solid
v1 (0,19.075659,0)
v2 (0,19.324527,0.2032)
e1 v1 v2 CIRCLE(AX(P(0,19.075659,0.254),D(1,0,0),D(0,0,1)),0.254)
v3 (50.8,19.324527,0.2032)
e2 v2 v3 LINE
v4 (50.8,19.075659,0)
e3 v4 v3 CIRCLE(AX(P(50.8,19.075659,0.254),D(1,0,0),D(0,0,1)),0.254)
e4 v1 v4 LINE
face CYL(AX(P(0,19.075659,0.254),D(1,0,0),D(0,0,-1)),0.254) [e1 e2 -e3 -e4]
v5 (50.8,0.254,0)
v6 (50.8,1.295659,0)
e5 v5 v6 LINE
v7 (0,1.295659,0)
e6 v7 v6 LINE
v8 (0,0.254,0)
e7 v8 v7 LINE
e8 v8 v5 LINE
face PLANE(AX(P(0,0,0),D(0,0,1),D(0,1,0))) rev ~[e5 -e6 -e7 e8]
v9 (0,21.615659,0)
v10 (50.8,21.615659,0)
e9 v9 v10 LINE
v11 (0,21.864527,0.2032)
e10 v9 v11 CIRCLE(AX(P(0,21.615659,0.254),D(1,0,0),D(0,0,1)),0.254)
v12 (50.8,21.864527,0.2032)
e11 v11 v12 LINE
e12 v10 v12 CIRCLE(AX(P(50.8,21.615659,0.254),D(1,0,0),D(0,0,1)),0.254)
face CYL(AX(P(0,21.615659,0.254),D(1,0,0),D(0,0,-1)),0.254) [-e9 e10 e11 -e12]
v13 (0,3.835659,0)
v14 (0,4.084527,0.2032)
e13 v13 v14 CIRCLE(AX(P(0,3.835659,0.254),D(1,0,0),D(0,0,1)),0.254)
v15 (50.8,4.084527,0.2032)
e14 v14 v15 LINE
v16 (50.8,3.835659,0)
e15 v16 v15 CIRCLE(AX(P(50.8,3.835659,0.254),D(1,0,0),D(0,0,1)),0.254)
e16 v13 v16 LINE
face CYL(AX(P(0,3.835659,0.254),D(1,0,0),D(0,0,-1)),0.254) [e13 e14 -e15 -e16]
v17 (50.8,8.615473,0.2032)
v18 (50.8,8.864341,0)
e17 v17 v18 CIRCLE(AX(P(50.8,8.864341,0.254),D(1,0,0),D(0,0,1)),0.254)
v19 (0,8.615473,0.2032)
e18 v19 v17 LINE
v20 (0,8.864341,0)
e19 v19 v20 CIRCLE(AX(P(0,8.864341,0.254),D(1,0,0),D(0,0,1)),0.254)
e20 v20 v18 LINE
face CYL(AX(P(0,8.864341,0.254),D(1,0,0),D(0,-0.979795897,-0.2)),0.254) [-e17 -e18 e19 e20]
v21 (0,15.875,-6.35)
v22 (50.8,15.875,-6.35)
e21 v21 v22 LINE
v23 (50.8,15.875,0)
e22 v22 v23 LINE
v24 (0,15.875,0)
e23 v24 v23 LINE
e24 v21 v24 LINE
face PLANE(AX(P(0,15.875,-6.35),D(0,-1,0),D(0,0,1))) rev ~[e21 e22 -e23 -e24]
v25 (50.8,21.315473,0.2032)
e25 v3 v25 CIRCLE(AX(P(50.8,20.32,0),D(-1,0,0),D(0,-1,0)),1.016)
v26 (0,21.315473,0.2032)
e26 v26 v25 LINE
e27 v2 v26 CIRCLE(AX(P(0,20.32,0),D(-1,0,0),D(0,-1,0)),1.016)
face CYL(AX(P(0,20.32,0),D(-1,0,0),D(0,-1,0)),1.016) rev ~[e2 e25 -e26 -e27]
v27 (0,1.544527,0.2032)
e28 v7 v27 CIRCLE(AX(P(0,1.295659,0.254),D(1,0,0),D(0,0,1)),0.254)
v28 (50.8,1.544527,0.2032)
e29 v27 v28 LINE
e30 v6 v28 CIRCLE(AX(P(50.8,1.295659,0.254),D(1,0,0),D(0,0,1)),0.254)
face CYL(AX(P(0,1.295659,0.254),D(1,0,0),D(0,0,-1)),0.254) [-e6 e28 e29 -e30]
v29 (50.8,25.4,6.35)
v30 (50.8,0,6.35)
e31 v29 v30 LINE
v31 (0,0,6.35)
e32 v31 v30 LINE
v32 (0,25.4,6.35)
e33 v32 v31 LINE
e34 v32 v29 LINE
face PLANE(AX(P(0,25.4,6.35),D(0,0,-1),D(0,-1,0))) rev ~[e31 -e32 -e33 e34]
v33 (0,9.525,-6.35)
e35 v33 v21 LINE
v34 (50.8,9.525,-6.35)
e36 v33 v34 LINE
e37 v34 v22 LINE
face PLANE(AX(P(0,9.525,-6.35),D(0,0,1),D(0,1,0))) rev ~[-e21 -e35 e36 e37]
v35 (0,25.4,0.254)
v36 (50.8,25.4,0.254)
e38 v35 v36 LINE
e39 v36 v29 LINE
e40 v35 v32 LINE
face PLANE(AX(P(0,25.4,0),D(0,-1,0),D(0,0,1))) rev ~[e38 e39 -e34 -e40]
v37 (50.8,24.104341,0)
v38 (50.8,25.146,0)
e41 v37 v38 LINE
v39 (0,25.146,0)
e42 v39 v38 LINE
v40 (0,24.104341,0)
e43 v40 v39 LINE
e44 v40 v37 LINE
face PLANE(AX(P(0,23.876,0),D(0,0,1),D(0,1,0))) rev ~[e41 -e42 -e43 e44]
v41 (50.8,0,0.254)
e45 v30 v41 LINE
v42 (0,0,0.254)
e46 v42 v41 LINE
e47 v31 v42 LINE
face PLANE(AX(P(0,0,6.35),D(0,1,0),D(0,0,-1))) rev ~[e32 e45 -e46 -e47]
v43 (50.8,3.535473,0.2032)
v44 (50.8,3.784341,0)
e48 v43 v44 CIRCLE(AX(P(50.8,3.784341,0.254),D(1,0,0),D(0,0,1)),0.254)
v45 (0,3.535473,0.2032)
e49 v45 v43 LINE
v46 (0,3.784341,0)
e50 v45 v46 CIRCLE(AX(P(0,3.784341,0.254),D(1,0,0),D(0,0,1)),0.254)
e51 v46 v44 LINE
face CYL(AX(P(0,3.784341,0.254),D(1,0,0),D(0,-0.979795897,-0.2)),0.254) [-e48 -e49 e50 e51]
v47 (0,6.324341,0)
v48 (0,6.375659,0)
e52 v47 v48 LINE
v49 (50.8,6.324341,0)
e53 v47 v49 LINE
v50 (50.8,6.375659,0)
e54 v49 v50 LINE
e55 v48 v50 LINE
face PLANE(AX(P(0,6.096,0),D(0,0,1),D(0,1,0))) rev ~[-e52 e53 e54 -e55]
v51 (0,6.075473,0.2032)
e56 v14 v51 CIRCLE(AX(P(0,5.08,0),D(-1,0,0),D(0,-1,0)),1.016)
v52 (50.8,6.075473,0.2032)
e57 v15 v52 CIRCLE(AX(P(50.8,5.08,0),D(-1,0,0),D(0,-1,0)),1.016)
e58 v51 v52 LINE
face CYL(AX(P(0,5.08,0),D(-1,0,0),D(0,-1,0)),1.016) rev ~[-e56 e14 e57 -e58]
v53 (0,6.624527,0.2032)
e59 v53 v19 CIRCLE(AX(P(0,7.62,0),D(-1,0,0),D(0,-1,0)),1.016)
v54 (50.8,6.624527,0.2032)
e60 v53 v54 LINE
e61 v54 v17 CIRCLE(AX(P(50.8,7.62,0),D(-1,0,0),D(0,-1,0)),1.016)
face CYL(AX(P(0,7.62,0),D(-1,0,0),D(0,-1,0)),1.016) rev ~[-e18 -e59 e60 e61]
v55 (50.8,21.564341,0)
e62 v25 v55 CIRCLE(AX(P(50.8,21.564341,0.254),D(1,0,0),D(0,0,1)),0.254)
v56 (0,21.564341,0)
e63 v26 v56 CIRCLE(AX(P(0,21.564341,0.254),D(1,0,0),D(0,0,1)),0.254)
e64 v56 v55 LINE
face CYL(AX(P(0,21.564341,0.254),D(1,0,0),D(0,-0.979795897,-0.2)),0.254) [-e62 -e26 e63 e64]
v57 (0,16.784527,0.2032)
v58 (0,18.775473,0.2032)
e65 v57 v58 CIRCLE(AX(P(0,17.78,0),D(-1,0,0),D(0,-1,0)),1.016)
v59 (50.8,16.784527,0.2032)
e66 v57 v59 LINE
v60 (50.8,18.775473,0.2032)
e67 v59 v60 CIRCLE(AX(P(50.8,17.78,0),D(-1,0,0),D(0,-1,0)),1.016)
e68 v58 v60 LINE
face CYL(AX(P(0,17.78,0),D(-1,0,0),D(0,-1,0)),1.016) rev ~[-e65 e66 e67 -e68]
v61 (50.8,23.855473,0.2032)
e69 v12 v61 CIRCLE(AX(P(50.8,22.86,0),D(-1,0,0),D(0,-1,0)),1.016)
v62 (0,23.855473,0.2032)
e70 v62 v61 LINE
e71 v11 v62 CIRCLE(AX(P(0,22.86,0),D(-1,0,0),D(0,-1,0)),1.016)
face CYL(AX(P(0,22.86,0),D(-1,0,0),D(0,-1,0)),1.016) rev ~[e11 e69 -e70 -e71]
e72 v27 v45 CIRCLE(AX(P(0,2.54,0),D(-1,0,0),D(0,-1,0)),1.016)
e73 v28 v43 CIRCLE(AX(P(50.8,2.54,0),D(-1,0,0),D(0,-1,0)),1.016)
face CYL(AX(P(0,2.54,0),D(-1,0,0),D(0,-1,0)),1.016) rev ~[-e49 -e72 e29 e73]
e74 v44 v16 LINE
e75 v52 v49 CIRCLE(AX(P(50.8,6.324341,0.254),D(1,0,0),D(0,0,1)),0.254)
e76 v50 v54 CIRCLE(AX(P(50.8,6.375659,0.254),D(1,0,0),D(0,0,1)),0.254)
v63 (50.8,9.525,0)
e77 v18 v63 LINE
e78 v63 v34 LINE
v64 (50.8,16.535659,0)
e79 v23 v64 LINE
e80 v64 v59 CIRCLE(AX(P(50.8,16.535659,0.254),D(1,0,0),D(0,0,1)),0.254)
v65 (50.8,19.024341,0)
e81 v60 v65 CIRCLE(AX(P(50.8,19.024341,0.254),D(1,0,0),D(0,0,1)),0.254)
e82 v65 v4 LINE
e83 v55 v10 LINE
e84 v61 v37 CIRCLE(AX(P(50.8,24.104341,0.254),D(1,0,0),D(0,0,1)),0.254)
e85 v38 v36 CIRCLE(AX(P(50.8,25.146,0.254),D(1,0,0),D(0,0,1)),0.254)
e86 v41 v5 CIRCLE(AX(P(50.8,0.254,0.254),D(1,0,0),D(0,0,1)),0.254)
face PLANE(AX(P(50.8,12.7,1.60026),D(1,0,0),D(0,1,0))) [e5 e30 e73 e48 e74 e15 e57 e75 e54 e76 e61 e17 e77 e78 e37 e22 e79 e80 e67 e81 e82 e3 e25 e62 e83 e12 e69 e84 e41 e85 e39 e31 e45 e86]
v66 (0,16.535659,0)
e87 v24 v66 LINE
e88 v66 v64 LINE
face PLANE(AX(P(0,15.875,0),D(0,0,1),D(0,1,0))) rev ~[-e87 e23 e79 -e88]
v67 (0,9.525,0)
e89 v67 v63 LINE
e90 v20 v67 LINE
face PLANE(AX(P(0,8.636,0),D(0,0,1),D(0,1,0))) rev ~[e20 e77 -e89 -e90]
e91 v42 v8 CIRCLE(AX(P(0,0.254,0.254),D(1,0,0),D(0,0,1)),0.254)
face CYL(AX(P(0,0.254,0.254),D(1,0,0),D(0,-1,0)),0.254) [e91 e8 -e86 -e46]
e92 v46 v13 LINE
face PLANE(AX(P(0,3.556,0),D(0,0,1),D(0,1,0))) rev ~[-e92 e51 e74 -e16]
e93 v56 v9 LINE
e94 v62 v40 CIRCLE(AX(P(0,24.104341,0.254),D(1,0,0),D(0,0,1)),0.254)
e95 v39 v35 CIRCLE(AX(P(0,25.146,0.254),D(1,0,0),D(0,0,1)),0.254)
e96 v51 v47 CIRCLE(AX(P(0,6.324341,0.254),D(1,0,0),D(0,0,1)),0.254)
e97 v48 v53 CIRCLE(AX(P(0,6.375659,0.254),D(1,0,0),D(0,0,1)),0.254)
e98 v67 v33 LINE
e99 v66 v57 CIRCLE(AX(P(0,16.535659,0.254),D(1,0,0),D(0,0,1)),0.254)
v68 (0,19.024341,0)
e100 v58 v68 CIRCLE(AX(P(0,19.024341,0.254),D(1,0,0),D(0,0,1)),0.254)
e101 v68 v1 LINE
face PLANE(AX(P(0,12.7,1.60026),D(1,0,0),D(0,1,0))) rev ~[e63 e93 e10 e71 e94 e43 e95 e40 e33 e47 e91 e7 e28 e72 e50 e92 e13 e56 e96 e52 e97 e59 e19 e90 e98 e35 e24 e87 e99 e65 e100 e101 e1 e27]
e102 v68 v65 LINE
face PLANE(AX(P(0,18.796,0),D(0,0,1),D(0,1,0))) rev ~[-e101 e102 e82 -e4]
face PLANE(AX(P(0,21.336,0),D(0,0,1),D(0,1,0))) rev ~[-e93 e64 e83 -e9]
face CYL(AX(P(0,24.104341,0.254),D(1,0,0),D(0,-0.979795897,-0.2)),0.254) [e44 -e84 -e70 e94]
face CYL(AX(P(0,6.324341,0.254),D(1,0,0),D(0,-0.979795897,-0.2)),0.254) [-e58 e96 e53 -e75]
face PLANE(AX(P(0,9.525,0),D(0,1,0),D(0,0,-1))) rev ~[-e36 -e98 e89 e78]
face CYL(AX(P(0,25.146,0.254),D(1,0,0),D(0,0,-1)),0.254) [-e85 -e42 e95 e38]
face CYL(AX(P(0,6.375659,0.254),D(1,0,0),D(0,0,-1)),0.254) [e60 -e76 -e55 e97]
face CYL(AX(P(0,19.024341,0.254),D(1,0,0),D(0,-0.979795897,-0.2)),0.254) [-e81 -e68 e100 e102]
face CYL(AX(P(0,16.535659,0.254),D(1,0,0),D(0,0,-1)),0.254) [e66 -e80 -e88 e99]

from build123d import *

# Parameters (mm, degrees)
F1_DEPTH = 50.8
F2_R     = 0.254


with BuildPart() as f1:
    # F0 (on Right) → F1 (new body)
    with BuildSketch(Plane.YZ):
        with BuildLine():
            Line((0, 6.35), (0, 0))
            Line((0, 0), (1.524, 0))
            ThreePointArc((1.524, 0), (2.54, 1.016), (3.556, 0))
            Line((3.556, 0), (4.064, 0))
            ThreePointArc((4.064, 0), (5.08, 1.016), (6.096, 0))
            Line((6.096, 0), (6.604, 0))
            ThreePointArc((6.604, 0), (7.62, 1.016), (8.636, 0))
            Line((8.636, 0), (9.525, 0))
            Line((9.525, 0), (9.525, -6.35))
            Line((9.525, -6.35), (15.875, -6.35))
            Line((15.875, -6.35), (15.875, 0))
            Line((15.875, 0), (16.764, 0))
            ThreePointArc((16.764, 0), (17.78, 1.016), (18.796, 0))
            Line((18.796, 0), (19.304, 0))
            ThreePointArc((19.304, 0), (20.32, 1.016), (21.336, 0))
            Line((21.336, 0), (21.844, 0))
            ThreePointArc((21.844, 0), (22.86, 1.016), (23.876, 0))
            Line((23.876, 0), (25.4, 0))
            Line((25.4, 0), (25.4, 6.35))
            Line((25.4, 6.35), (0, 6.35))
        make_face()
    extrude(amount=F1_DEPTH)

    # F2
    f2_edges = [f1.edges().sort_by_distance(p)[0] for p in [
        (25.4, 23.876, 0),
        (25.4, 25.4, 0),
        (25.4, 21.336, 0),
        (25.4, 18.796, 0),
        (25.4, 6.604, 0),
        (25.4, 4.064, 0),
        (25.4, 1.524, 0),
        (25.4, 0, 0),
        (25.4, 3.556, 0),
        (25.4, 6.096, 0),
        (25.4, 8.636, 0),
        (25.4, 16.764, 0),
        (25.4, 19.304, 0),
        (25.4, 21.844, 0),
    ]]
    fillet(f2_edges, radius=F2_R)


solid = f1.part
